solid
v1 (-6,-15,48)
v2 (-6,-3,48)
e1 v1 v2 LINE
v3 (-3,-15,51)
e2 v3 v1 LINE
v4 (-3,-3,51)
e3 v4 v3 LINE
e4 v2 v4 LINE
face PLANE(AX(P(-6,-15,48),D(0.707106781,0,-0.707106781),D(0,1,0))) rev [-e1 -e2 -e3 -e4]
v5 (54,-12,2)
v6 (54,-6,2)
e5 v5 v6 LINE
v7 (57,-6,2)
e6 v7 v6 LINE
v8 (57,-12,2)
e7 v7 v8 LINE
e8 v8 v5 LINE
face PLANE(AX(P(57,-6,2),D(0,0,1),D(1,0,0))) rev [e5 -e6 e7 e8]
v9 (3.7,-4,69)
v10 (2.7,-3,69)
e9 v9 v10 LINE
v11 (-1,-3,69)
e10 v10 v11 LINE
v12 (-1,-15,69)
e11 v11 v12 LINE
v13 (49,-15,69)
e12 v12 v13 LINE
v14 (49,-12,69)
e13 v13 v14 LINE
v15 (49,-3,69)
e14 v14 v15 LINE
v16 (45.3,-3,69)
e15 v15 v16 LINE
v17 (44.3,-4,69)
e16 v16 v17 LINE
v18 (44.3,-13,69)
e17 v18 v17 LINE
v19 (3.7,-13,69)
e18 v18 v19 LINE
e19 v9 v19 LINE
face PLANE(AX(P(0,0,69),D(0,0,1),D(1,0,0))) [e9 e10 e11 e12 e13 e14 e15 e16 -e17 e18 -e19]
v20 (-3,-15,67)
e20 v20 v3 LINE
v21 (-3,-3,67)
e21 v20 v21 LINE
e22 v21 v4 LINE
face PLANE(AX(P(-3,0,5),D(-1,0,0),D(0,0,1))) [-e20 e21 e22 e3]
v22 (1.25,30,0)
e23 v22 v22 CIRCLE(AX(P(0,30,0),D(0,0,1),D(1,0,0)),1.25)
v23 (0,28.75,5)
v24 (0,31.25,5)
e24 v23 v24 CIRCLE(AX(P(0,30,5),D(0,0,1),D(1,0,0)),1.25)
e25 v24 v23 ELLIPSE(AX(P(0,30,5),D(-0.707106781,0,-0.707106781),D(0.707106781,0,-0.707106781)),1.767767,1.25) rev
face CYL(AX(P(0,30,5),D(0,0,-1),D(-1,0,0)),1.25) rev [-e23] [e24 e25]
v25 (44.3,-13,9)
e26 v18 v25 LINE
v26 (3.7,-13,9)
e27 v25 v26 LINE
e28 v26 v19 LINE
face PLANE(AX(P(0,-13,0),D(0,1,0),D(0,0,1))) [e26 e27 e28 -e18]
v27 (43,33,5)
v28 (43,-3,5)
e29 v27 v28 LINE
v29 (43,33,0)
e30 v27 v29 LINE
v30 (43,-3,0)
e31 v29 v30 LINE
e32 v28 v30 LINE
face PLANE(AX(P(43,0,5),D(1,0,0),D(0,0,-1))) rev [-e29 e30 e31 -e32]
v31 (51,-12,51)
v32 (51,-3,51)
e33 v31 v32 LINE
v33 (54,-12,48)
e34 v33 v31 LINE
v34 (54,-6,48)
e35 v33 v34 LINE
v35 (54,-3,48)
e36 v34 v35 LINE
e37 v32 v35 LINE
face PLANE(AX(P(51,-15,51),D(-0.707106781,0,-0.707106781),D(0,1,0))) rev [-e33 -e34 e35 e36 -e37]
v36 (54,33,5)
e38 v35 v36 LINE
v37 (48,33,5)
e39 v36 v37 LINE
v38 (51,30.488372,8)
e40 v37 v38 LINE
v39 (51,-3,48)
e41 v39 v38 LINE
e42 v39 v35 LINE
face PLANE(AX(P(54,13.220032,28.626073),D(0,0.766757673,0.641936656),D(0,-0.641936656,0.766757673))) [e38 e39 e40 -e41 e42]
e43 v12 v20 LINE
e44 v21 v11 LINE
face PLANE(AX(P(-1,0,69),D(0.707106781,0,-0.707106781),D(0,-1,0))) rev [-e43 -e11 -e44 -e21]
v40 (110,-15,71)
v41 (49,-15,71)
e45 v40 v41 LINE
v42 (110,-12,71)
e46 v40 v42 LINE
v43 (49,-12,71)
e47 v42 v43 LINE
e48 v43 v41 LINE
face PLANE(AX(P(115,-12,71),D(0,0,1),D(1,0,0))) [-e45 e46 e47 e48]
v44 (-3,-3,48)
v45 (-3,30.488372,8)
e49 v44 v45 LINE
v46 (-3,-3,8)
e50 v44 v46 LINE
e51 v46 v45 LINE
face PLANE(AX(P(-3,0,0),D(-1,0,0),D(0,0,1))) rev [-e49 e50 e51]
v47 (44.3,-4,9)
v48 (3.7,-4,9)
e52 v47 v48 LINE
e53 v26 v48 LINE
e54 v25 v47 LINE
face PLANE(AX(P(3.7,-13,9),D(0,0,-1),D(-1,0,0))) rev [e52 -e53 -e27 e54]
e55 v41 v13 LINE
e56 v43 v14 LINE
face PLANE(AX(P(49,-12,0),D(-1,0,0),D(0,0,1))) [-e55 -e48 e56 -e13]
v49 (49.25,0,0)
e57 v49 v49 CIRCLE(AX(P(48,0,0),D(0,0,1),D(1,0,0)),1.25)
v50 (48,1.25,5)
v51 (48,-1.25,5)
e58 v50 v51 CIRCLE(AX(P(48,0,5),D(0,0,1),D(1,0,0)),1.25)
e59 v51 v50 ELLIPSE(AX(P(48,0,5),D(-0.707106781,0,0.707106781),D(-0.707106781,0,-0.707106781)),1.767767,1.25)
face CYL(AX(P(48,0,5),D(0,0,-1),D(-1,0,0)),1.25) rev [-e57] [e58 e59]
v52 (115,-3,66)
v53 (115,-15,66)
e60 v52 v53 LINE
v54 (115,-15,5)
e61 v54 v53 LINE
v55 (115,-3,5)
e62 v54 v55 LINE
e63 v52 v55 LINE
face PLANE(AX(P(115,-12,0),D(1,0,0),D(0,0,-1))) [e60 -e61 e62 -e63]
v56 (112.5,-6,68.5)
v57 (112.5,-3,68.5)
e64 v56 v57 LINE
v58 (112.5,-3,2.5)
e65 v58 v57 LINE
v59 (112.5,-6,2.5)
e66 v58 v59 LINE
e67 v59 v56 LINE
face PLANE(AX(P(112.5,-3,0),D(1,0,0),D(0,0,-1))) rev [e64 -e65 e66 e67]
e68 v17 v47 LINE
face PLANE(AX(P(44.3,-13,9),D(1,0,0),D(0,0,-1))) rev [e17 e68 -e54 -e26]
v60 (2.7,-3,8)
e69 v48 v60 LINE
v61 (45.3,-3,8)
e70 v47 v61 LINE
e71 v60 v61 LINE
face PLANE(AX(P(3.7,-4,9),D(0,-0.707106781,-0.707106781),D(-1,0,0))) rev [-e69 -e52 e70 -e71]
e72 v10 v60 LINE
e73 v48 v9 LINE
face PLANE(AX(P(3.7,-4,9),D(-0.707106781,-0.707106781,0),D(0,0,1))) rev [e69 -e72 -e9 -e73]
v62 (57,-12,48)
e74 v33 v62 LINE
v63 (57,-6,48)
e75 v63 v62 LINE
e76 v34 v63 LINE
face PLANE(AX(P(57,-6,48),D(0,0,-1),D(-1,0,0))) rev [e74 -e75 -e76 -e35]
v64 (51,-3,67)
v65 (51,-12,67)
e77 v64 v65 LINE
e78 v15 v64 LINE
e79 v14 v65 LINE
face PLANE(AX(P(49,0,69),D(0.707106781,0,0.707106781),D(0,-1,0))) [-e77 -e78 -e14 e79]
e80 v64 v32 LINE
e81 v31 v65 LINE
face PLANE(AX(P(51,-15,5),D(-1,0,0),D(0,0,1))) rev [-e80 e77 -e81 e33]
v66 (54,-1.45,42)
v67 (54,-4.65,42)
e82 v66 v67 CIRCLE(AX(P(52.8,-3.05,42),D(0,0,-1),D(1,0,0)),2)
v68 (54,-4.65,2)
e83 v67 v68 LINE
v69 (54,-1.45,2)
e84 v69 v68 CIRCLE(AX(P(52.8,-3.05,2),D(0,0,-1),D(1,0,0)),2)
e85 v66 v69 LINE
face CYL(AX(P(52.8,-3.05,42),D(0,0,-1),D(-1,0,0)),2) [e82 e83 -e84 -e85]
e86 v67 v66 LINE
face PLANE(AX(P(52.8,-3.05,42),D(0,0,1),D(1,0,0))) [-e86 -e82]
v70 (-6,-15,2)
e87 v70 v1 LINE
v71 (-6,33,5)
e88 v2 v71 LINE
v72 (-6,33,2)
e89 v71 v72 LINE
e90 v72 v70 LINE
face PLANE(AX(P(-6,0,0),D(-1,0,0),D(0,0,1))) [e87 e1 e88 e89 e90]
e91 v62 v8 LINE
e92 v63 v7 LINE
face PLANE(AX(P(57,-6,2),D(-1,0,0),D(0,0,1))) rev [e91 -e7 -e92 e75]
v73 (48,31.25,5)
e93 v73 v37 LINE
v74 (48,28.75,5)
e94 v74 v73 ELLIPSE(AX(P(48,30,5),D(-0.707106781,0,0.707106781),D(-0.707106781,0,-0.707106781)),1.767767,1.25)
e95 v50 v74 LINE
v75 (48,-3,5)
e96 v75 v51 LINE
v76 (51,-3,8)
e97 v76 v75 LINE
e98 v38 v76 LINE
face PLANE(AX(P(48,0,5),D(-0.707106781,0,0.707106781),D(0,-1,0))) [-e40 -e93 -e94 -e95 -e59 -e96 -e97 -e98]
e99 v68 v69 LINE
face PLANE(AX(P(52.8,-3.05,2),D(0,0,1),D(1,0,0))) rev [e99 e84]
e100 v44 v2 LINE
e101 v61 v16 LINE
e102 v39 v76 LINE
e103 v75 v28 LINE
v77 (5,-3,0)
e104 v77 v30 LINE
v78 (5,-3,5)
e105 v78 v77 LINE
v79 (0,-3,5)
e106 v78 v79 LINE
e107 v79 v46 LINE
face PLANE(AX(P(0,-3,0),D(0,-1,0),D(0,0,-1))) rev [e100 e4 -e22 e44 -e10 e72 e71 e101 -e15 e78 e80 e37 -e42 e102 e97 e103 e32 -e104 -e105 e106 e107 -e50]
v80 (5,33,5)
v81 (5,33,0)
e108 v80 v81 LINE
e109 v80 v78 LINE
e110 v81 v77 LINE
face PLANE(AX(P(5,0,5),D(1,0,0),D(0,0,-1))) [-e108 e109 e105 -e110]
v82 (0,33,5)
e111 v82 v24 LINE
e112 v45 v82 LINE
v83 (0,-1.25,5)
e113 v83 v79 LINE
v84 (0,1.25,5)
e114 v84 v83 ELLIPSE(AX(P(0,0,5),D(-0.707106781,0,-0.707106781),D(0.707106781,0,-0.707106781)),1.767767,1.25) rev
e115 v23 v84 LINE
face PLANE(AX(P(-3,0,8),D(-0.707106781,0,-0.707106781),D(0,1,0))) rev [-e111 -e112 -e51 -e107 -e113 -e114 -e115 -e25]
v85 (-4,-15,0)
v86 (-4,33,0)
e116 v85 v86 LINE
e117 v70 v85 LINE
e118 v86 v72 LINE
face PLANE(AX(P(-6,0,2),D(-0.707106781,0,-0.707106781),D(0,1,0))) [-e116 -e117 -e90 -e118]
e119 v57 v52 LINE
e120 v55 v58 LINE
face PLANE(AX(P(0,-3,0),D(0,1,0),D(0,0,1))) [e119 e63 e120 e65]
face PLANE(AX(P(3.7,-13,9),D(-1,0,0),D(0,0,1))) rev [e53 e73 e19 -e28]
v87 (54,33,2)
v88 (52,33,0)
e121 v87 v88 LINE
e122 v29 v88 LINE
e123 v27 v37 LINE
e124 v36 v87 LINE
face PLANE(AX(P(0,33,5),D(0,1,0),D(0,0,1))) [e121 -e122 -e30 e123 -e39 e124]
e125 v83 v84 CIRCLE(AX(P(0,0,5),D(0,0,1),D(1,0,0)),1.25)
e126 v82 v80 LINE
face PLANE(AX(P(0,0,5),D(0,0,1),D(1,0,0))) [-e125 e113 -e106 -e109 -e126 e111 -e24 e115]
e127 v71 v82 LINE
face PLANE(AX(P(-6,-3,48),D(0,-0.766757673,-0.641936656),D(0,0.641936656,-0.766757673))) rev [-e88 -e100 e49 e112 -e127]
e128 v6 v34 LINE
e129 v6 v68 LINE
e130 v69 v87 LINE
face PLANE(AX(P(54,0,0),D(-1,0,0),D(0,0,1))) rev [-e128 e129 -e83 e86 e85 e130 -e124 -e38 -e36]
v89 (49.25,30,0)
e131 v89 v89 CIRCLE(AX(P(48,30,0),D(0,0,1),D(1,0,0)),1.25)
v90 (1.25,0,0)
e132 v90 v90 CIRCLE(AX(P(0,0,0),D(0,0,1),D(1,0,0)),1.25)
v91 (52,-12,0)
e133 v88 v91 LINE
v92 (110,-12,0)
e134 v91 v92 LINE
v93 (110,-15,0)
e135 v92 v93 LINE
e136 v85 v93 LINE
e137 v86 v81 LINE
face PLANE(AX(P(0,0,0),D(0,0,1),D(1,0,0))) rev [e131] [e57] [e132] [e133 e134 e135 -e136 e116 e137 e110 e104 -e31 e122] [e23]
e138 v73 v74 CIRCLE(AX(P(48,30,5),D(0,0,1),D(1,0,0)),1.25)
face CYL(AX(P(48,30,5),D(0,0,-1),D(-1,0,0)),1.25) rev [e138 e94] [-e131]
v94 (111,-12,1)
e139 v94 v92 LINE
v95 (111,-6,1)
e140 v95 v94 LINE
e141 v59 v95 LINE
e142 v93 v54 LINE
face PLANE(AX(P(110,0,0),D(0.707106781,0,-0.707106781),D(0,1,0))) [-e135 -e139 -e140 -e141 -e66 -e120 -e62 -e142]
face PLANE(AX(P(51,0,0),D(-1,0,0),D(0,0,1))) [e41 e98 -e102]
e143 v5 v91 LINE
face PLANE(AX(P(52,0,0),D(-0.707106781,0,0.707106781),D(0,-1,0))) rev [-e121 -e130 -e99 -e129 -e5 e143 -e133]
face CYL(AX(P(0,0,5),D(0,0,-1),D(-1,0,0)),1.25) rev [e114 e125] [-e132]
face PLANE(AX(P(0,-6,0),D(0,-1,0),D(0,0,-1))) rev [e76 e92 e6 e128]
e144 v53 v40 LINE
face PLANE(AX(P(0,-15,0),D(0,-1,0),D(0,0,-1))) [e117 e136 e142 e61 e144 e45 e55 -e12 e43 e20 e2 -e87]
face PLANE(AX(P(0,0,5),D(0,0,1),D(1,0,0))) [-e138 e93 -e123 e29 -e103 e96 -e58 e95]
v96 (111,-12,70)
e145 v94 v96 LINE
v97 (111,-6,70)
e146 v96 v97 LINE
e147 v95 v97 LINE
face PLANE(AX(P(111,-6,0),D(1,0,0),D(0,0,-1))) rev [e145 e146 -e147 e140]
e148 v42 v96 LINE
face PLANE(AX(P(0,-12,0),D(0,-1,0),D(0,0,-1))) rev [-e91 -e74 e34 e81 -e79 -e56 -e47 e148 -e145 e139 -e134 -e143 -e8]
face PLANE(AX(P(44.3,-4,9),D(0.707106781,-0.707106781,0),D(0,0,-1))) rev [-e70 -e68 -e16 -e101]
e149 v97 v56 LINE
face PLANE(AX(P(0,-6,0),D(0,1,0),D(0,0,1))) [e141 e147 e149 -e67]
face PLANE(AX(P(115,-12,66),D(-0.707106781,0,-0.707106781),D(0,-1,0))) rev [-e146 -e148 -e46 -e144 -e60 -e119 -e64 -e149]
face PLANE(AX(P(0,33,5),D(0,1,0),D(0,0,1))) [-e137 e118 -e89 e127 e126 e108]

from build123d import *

# Parameters (mm, degrees)
SKETCH1_W             = 8
SKETCH1_H             = 36
SKETCH1_R             = 1.25
BOSS_EXTRUDE1_DEPTH   = 5
BOSS_EXTRUDE1_2_DEPTH = 5
SKETCH2_W             = 54
SKETCH2_H             = 5
BOSS_EXTRUDE2_DEPTH   = 12
SKETCH4_W             = 54
SKETCH4_H             = 12
BOSS_EXTRUDE3_DEPTH   = 64
SKETCH5_W             = 40.6
SKETCH5_H             = 60.5
CUT_EXTRUDE1_DEPTH    = 10
BOSS_EXTRUDE4_DEPTH   = 3
BOSS_EXTRUDE5_START   = -54
BOSS_EXTRUDE5_DEPTH   = 3
CHAMFER1_SIZE         = 2
CHAMFER2_SIZE         = 1
CHAMFER3_SIZE         = 3
SKETCH8_W             = 66
SKETCH8_H             = 71
BOSS_EXTRUDE6_DEPTH   = 3
SKETCH9_W             = 3
SKETCH9_H             = 46
SKETCH9_W_2           = 4
SKETCH9_H_2           = 71
BOSS_EXTRUDE7_DEPTH   = 6
BOSS_EXTRUDE8_DEPTH   = 40
SKETCH12_W            = 2.5
SKETCH12_H            = 71
BOSS_EXTRUDE9_DEPTH   = 3
CHAMFER4_SIZE         = 5


with BuildPart() as part:
    # Sketch1 → Boss-Extrude1 (new body)
    with BuildSketch(Plane.XY):
        with Locations((1, 15)):
            Rectangle(SKETCH1_W, SKETCH1_H)
        Circle(SKETCH1_R, mode=Mode.SUBTRACT)
        with Locations((0, 30)):
            Circle(SKETCH1_R, mode=Mode.SUBTRACT)
    extrude(amount=BOSS_EXTRUDE1_DEPTH)



with BuildPart() as body_2:
    # Sketch1 → Boss-Extrude1 2 (new body)
    with BuildSketch(Plane.XY):
        with Locations((47, 15)):
            Rectangle(SKETCH1_W, SKETCH1_H)
        with Locations((48, 0)):
            Circle(SKETCH1_R, mode=Mode.SUBTRACT)
        with Locations((48, 30)):
            Circle(SKETCH1_R, mode=Mode.SUBTRACT)
    extrude(amount=BOSS_EXTRUDE1_2_DEPTH)


with BuildPart() as part_1:
    add(part.part)

    add(body_2.part)  # Boss-Extrude2 merges body 2
    # Sketch2 → Boss-Extrude2 (add)
    with BuildSketch(Plane.XZ.offset(3)):
        with Locations((24, 2.5)):
            Rectangle(SKETCH2_W, SKETCH2_H)
    extrude(amount=BOSS_EXTRUDE2_DEPTH)

    # Sketch4 → Boss-Extrude3 (add)
    with BuildSketch(Plane.XY.offset(5)):
        with Locations((24, -9)):
            Rectangle(SKETCH4_W, SKETCH4_H)
    extrude(amount=BOSS_EXTRUDE3_DEPTH)

    # Sketch5 → Cut-Extrude1 (cut)
    with BuildSketch(Plane(origin=(0, -3, 0), x_dir=(1, 0, 0), z_dir=(0, 1, 0))):
        with Locations((24, -39.25)):
            Rectangle(SKETCH5_W, SKETCH5_H)
    extrude(amount=-CUT_EXTRUDE1_DEPTH, mode=Mode.SUBTRACT)

    # Sketch7 → Boss-Extrude4 (add)
    with BuildSketch(Plane.ZY.offset(3)):
        Polygon((0, 33), (0, -15), (48, -15), (48, -3), (5, 33), align=None)
    extrude(amount=BOSS_EXTRUDE4_DEPTH)

    # Sketch7<2> → Boss-Extrude5 (add)
    with BuildSketch(Plane.ZY.offset(3).offset(BOSS_EXTRUDE5_START)):
        Polygon((0, 33), (0, -15), (48, -15), (48, -3), (5, 33), align=None)
    extrude(amount=-BOSS_EXTRUDE5_DEPTH)

    # Chamfer1
    chamfer1_edges = [part_1.edges().sort_by_distance(p)[0] for p in [
        (-3, -9, 69),
        (51, -9, 69),
        (-6, 9, 0),
        (54, 9, 0),
    ]]
    chamfer(chamfer1_edges, length=CHAMFER1_SIZE)

    # Chamfer2
    chamfer2_edges = [part_1.edges().sort_by_distance(p)[0] for p in [
        (44.3, -3, 39),
        (24, -3, 9),
        (3.7, -3, 39),
    ]]
    chamfer(chamfer2_edges, length=CHAMFER2_SIZE)

    # Chamfer3
    # the kernel refuses this chamfer: 3 mm, written as the material it adds along each edge
    with BuildSketch(Plane(origin=(51, -15, 48), x_dir=(-0.027495876610584467, 0, 0.9996219169112969), z_dir=(0, 1, 0))) as chamfer3_piece_1_section:
        Polygon((CHAMFER3_SIZE * 0.999621916911, CHAMFER3_SIZE * 0.0274958766106), (-CHAMFER3_SIZE * 0.0274958766106, CHAMFER3_SIZE * 0.999621916911), (0, 0), align=None)
    chamfer3_piece_1 = extrude(amount=12, mode=Mode.PRIVATE)
    chamfer3_piece_1 = split(chamfer3_piece_1, bisect_by=Plane(origin=(54, -9.397887016, 48.948587344), z_dir=(-1, 0, 0)), keep=Keep.TOP, mode=Mode.PRIVATE)
    chamfer3_piece_1 = split(chamfer3_piece_1, bisect_by=Plane(origin=(52.008422093, -6.10336241, 51.70679399), z_dir=(0, -0.7667576729931039, -0.6419366564593428)), keep=Keep.TOP, mode=Mode.PRIVATE)
    add(chamfer3_piece_1)
    with BuildSketch(Plane(origin=(51, -15, 48), x_dir=(-0.027495876610584467, 0, 0.9996219169112969), z_dir=(0, 1, 0))) as chamfer3_piece_2_section:
        Polygon((CHAMFER3_SIZE * 0.999621916911, CHAMFER3_SIZE * 0.0274958766106), (-CHAMFER3_SIZE * 0.0274958766106, CHAMFER3_SIZE * 0.999621916911), (0, 0), align=None)
    chamfer3_piece_2 = extrude(amount=12, mode=Mode.PRIVATE)
    chamfer3_piece_2 = split(chamfer3_piece_2, bisect_by=Plane(origin=(51.683373084, -4.039508932, 49.241635668), z_dir=(0, 0.7667576729931039, 0.6419366564593428)), keep=Keep.TOP, mode=Mode.PRIVATE)
    add(chamfer3_piece_2)
    with BuildSketch(Plane(origin=(-3, -15, 48), x_dir=(0.027495876610586334, 0, 0.9996219169112968), z_dir=(0, 1, 0))) as chamfer3_piece_3_section:
        Polygon((CHAMFER3_SIZE * 0.999621916911, -CHAMFER3_SIZE * 0.0274958766106), (-CHAMFER3_SIZE * 0.0274958766106, -CHAMFER3_SIZE * 0.999621916911), (0, 0), align=None)
    chamfer3_piece_3 = extrude(amount=12, mode=Mode.PRIVATE)
    chamfer3_piece_3 = split(chamfer3_piece_3, bisect_by=Plane(origin=(-6, -9.397887016, 48.948587344), z_dir=(1, 0, 0)), keep=Keep.TOP, mode=Mode.PRIVATE)
    chamfer3_piece_3 = split(chamfer3_piece_3, bisect_by=Plane(origin=(-4.008422093, -6.10336241, 51.70679399), z_dir=(0, -0.7667576729931039, -0.6419366564593428)), keep=Keep.TOP, mode=Mode.PRIVATE)
    add(chamfer3_piece_3)
    with BuildSketch(Plane(origin=(-3, -15, 48), x_dir=(0.027495876610586334, 0, 0.9996219169112968), z_dir=(0, 1, 0))) as chamfer3_piece_4_section:
        Polygon((CHAMFER3_SIZE * 0.999621916911, -CHAMFER3_SIZE * 0.0274958766106), (-CHAMFER3_SIZE * 0.0274958766106, -CHAMFER3_SIZE * 0.999621916911), (0, 0), align=None)
    chamfer3_piece_4 = extrude(amount=12, mode=Mode.PRIVATE)
    chamfer3_piece_4 = split(chamfer3_piece_4, bisect_by=Plane(origin=(-3.683373084, -4.039508932, 49.241635668), z_dir=(0, 0.7667576729931039, 0.6419366564593428)), keep=Keep.TOP, mode=Mode.PRIVATE)
    add(chamfer3_piece_4)
    with BuildSketch(Plane(origin=(-3, 33, 5), x_dir=(-0.02749587661058635, 0, 0.9996219169112968), z_dir=(0, -1, 0))) as chamfer3_piece_5_section:
        Polygon((CHAMFER3_SIZE * 0.999621916911, -CHAMFER3_SIZE * 0.0274958766106), (-CHAMFER3_SIZE * 0.0274958766106, -CHAMFER3_SIZE * 0.999621916911), (0, 0), align=None)
    chamfer3_piece_5 = extrude(amount=43.715048964, mode=Mode.PRIVATE)
    chamfer3_piece_5 = split(chamfer3_piece_5, bisect_by=Plane(origin=(-2.02772284, 24.92424675, 14.646038604), z_dir=(0, -0.7667576729931039, -0.6419366564593428)), keep=Keep.TOP, mode=Mode.PRIVATE)
    chamfer3_piece_5 = chamfer3_piece_5 - Plane(origin=(0, 0, 5.988374144), x_dir=(1, 0, 0), z_dir=(0, 0, -1)) * Cylinder(1.25, 100, mode=Mode.PRIVATE)
    chamfer3_piece_5 = chamfer3_piece_5 - Plane(origin=(0, 30, 5.988374144), x_dir=(1, 0, 0), z_dir=(0, 0, -1)) * Cylinder(1.25, 100, mode=Mode.PRIVATE)
    add(chamfer3_piece_5)
    with BuildSketch(Plane(origin=(51, -10.715048964, 5), x_dir=(0.02749587661058678, 0, 0.9996219169112968), z_dir=(0, 1, 0))) as chamfer3_piece_6_section:
        Polygon((CHAMFER3_SIZE * 0.999621916911, -CHAMFER3_SIZE * 0.0274958766106), (-CHAMFER3_SIZE * 0.0274958766106, -CHAMFER3_SIZE * 0.999621916911), (0, 0), align=None)
    chamfer3_piece_6 = extrude(amount=43.715048964, mode=Mode.PRIVATE)
    chamfer3_piece_6 = split(chamfer3_piece_6, bisect_by=Plane(origin=(50.01061912, 16.088421834, 25.199940587), z_dir=(0, -0.7667576729931039, -0.6419366564593428)), keep=Keep.TOP, mode=Mode.PRIVATE)
    chamfer3_piece_6 = chamfer3_piece_6 - Plane(origin=(48, 0, 5.98938088), x_dir=(1, 0, 0), z_dir=(0, 0, -1)) * Cylinder(1.25, 100, mode=Mode.PRIVATE)
    chamfer3_piece_6 = chamfer3_piece_6 - Plane(origin=(48, 30, 5.98938088), x_dir=(1, 0, 0), z_dir=(0, 0, -1)) * Cylinder(1.25, 100, mode=Mode.PRIVATE)
    add(chamfer3_piece_6)

    # Sketch8 → Boss-Extrude6 (add)
    with BuildSketch(Plane.XZ.offset(15)):
        with Locations((82, 35.5)):
            Rectangle(SKETCH8_W, SKETCH8_H)
    extrude(amount=-BOSS_EXTRUDE6_DEPTH)

    # Sketch9 → Boss-Extrude7 (add)
    with BuildSketch(Plane(origin=(0, -12, 0), x_dir=(1, 0, 0), z_dir=(0, 1, 0))):
        with Locations((55.5, -25)):
            Rectangle(SKETCH9_W, SKETCH9_H)
        with Locations((113, -35.5)):
            Rectangle(SKETCH9_W_2, SKETCH9_H_2)
    extrude(amount=BOSS_EXTRUDE7_DEPTH)

    # Sketch11 → Boss-Extrude8 (add)
    with BuildSketch(Plane(origin=(0, 0, 2), x_dir=(-1, 0, 0), z_dir=(0, 0, -1))):
        with BuildLine():
            Line((-54, -1.45), (-54, -4.65))
            ThreePointArc((-54, -4.65), (-54.8, -3.05), (-54, -1.45))
        make_face()
    extrude(amount=-BOSS_EXTRUDE8_DEPTH)

    # Sketch12 → Boss-Extrude9 (add)
    with BuildSketch(Plane(origin=(0, -6, 0), x_dir=(1, 0, 0), z_dir=(0, 1, 0))):
        with Locations((113.75, -35.5)):
            Rectangle(SKETCH12_W, SKETCH12_H)
    extrude(amount=BOSS_EXTRUDE9_DEPTH)

    # Chamfer4
    # the kernel refuses this chamfer: 5 mm, written as the material it takes off along each edge
    with BuildSketch(Plane(origin=(115, -12, 0), x_dir=(-0.9996219169112968, 0, -0.027495876610586334), z_dir=(0, 1, 0))) as chamfer4_piece_1:
        Polygon((CHAMFER4_SIZE * 0.999621916911, CHAMFER4_SIZE * 0.0274958766106), (-CHAMFER4_SIZE * 0.0274958766106, CHAMFER4_SIZE * 0.999621916911), (0, 0), align=None)
    extrude(amount=6, mode=Mode.SUBTRACT)
    with BuildSketch(Plane(origin=(115, -12, 71), x_dir=(-0.9996219169112968, 0, 0.027495876610587663), z_dir=(0, 1, 0))) as chamfer4_piece_2:
        Polygon((CHAMFER4_SIZE * 0.999621916911, -CHAMFER4_SIZE * 0.0274958766106), (-CHAMFER4_SIZE * 0.0274958766106, -CHAMFER4_SIZE * 0.999621916911), (0, 0), align=None)
    extrude(amount=6, mode=Mode.SUBTRACT)
    with BuildSketch(Plane(origin=(115, -27.85841494, 71), x_dir=(-0.9996219169112968, 0, 0.027495876610587663), z_dir=(0, 1, 0)), Plane(origin=(115, -6, 71), x_dir=(-0.9996219169112968, 0, 0.027495876610587663), z_dir=(0, 1, 0))) as chamfer4_piece_3:
        Polygon((CHAMFER4_SIZE * 0.999621916911, -CHAMFER4_SIZE * 0.0274958766106), (-CHAMFER4_SIZE * 0.0274958766106, -CHAMFER4_SIZE * 0.999621916911), (0, 0), align=None)
    extrude(amount=15.85841494, mode=Mode.SUBTRACT)
    with BuildSketch(Plane(origin=(115, -27.85841494, 0), x_dir=(-0.9996219169112968, 0, -0.02749587661058646), z_dir=(0, 1, 0)), Plane(origin=(115, -6, 0), x_dir=(-0.9996219169112968, 0, -0.02749587661058634), z_dir=(0, 1, 0))) as chamfer4_piece_4:
        Polygon((CHAMFER4_SIZE * 0.999621916911, CHAMFER4_SIZE * 0.0274958766106), (-CHAMFER4_SIZE * 0.0274958766106, CHAMFER4_SIZE * 0.999621916911), (0, 0), align=None)
    extrude(amount=15.85841494, mode=Mode.SUBTRACT)


solid = part_1.part
